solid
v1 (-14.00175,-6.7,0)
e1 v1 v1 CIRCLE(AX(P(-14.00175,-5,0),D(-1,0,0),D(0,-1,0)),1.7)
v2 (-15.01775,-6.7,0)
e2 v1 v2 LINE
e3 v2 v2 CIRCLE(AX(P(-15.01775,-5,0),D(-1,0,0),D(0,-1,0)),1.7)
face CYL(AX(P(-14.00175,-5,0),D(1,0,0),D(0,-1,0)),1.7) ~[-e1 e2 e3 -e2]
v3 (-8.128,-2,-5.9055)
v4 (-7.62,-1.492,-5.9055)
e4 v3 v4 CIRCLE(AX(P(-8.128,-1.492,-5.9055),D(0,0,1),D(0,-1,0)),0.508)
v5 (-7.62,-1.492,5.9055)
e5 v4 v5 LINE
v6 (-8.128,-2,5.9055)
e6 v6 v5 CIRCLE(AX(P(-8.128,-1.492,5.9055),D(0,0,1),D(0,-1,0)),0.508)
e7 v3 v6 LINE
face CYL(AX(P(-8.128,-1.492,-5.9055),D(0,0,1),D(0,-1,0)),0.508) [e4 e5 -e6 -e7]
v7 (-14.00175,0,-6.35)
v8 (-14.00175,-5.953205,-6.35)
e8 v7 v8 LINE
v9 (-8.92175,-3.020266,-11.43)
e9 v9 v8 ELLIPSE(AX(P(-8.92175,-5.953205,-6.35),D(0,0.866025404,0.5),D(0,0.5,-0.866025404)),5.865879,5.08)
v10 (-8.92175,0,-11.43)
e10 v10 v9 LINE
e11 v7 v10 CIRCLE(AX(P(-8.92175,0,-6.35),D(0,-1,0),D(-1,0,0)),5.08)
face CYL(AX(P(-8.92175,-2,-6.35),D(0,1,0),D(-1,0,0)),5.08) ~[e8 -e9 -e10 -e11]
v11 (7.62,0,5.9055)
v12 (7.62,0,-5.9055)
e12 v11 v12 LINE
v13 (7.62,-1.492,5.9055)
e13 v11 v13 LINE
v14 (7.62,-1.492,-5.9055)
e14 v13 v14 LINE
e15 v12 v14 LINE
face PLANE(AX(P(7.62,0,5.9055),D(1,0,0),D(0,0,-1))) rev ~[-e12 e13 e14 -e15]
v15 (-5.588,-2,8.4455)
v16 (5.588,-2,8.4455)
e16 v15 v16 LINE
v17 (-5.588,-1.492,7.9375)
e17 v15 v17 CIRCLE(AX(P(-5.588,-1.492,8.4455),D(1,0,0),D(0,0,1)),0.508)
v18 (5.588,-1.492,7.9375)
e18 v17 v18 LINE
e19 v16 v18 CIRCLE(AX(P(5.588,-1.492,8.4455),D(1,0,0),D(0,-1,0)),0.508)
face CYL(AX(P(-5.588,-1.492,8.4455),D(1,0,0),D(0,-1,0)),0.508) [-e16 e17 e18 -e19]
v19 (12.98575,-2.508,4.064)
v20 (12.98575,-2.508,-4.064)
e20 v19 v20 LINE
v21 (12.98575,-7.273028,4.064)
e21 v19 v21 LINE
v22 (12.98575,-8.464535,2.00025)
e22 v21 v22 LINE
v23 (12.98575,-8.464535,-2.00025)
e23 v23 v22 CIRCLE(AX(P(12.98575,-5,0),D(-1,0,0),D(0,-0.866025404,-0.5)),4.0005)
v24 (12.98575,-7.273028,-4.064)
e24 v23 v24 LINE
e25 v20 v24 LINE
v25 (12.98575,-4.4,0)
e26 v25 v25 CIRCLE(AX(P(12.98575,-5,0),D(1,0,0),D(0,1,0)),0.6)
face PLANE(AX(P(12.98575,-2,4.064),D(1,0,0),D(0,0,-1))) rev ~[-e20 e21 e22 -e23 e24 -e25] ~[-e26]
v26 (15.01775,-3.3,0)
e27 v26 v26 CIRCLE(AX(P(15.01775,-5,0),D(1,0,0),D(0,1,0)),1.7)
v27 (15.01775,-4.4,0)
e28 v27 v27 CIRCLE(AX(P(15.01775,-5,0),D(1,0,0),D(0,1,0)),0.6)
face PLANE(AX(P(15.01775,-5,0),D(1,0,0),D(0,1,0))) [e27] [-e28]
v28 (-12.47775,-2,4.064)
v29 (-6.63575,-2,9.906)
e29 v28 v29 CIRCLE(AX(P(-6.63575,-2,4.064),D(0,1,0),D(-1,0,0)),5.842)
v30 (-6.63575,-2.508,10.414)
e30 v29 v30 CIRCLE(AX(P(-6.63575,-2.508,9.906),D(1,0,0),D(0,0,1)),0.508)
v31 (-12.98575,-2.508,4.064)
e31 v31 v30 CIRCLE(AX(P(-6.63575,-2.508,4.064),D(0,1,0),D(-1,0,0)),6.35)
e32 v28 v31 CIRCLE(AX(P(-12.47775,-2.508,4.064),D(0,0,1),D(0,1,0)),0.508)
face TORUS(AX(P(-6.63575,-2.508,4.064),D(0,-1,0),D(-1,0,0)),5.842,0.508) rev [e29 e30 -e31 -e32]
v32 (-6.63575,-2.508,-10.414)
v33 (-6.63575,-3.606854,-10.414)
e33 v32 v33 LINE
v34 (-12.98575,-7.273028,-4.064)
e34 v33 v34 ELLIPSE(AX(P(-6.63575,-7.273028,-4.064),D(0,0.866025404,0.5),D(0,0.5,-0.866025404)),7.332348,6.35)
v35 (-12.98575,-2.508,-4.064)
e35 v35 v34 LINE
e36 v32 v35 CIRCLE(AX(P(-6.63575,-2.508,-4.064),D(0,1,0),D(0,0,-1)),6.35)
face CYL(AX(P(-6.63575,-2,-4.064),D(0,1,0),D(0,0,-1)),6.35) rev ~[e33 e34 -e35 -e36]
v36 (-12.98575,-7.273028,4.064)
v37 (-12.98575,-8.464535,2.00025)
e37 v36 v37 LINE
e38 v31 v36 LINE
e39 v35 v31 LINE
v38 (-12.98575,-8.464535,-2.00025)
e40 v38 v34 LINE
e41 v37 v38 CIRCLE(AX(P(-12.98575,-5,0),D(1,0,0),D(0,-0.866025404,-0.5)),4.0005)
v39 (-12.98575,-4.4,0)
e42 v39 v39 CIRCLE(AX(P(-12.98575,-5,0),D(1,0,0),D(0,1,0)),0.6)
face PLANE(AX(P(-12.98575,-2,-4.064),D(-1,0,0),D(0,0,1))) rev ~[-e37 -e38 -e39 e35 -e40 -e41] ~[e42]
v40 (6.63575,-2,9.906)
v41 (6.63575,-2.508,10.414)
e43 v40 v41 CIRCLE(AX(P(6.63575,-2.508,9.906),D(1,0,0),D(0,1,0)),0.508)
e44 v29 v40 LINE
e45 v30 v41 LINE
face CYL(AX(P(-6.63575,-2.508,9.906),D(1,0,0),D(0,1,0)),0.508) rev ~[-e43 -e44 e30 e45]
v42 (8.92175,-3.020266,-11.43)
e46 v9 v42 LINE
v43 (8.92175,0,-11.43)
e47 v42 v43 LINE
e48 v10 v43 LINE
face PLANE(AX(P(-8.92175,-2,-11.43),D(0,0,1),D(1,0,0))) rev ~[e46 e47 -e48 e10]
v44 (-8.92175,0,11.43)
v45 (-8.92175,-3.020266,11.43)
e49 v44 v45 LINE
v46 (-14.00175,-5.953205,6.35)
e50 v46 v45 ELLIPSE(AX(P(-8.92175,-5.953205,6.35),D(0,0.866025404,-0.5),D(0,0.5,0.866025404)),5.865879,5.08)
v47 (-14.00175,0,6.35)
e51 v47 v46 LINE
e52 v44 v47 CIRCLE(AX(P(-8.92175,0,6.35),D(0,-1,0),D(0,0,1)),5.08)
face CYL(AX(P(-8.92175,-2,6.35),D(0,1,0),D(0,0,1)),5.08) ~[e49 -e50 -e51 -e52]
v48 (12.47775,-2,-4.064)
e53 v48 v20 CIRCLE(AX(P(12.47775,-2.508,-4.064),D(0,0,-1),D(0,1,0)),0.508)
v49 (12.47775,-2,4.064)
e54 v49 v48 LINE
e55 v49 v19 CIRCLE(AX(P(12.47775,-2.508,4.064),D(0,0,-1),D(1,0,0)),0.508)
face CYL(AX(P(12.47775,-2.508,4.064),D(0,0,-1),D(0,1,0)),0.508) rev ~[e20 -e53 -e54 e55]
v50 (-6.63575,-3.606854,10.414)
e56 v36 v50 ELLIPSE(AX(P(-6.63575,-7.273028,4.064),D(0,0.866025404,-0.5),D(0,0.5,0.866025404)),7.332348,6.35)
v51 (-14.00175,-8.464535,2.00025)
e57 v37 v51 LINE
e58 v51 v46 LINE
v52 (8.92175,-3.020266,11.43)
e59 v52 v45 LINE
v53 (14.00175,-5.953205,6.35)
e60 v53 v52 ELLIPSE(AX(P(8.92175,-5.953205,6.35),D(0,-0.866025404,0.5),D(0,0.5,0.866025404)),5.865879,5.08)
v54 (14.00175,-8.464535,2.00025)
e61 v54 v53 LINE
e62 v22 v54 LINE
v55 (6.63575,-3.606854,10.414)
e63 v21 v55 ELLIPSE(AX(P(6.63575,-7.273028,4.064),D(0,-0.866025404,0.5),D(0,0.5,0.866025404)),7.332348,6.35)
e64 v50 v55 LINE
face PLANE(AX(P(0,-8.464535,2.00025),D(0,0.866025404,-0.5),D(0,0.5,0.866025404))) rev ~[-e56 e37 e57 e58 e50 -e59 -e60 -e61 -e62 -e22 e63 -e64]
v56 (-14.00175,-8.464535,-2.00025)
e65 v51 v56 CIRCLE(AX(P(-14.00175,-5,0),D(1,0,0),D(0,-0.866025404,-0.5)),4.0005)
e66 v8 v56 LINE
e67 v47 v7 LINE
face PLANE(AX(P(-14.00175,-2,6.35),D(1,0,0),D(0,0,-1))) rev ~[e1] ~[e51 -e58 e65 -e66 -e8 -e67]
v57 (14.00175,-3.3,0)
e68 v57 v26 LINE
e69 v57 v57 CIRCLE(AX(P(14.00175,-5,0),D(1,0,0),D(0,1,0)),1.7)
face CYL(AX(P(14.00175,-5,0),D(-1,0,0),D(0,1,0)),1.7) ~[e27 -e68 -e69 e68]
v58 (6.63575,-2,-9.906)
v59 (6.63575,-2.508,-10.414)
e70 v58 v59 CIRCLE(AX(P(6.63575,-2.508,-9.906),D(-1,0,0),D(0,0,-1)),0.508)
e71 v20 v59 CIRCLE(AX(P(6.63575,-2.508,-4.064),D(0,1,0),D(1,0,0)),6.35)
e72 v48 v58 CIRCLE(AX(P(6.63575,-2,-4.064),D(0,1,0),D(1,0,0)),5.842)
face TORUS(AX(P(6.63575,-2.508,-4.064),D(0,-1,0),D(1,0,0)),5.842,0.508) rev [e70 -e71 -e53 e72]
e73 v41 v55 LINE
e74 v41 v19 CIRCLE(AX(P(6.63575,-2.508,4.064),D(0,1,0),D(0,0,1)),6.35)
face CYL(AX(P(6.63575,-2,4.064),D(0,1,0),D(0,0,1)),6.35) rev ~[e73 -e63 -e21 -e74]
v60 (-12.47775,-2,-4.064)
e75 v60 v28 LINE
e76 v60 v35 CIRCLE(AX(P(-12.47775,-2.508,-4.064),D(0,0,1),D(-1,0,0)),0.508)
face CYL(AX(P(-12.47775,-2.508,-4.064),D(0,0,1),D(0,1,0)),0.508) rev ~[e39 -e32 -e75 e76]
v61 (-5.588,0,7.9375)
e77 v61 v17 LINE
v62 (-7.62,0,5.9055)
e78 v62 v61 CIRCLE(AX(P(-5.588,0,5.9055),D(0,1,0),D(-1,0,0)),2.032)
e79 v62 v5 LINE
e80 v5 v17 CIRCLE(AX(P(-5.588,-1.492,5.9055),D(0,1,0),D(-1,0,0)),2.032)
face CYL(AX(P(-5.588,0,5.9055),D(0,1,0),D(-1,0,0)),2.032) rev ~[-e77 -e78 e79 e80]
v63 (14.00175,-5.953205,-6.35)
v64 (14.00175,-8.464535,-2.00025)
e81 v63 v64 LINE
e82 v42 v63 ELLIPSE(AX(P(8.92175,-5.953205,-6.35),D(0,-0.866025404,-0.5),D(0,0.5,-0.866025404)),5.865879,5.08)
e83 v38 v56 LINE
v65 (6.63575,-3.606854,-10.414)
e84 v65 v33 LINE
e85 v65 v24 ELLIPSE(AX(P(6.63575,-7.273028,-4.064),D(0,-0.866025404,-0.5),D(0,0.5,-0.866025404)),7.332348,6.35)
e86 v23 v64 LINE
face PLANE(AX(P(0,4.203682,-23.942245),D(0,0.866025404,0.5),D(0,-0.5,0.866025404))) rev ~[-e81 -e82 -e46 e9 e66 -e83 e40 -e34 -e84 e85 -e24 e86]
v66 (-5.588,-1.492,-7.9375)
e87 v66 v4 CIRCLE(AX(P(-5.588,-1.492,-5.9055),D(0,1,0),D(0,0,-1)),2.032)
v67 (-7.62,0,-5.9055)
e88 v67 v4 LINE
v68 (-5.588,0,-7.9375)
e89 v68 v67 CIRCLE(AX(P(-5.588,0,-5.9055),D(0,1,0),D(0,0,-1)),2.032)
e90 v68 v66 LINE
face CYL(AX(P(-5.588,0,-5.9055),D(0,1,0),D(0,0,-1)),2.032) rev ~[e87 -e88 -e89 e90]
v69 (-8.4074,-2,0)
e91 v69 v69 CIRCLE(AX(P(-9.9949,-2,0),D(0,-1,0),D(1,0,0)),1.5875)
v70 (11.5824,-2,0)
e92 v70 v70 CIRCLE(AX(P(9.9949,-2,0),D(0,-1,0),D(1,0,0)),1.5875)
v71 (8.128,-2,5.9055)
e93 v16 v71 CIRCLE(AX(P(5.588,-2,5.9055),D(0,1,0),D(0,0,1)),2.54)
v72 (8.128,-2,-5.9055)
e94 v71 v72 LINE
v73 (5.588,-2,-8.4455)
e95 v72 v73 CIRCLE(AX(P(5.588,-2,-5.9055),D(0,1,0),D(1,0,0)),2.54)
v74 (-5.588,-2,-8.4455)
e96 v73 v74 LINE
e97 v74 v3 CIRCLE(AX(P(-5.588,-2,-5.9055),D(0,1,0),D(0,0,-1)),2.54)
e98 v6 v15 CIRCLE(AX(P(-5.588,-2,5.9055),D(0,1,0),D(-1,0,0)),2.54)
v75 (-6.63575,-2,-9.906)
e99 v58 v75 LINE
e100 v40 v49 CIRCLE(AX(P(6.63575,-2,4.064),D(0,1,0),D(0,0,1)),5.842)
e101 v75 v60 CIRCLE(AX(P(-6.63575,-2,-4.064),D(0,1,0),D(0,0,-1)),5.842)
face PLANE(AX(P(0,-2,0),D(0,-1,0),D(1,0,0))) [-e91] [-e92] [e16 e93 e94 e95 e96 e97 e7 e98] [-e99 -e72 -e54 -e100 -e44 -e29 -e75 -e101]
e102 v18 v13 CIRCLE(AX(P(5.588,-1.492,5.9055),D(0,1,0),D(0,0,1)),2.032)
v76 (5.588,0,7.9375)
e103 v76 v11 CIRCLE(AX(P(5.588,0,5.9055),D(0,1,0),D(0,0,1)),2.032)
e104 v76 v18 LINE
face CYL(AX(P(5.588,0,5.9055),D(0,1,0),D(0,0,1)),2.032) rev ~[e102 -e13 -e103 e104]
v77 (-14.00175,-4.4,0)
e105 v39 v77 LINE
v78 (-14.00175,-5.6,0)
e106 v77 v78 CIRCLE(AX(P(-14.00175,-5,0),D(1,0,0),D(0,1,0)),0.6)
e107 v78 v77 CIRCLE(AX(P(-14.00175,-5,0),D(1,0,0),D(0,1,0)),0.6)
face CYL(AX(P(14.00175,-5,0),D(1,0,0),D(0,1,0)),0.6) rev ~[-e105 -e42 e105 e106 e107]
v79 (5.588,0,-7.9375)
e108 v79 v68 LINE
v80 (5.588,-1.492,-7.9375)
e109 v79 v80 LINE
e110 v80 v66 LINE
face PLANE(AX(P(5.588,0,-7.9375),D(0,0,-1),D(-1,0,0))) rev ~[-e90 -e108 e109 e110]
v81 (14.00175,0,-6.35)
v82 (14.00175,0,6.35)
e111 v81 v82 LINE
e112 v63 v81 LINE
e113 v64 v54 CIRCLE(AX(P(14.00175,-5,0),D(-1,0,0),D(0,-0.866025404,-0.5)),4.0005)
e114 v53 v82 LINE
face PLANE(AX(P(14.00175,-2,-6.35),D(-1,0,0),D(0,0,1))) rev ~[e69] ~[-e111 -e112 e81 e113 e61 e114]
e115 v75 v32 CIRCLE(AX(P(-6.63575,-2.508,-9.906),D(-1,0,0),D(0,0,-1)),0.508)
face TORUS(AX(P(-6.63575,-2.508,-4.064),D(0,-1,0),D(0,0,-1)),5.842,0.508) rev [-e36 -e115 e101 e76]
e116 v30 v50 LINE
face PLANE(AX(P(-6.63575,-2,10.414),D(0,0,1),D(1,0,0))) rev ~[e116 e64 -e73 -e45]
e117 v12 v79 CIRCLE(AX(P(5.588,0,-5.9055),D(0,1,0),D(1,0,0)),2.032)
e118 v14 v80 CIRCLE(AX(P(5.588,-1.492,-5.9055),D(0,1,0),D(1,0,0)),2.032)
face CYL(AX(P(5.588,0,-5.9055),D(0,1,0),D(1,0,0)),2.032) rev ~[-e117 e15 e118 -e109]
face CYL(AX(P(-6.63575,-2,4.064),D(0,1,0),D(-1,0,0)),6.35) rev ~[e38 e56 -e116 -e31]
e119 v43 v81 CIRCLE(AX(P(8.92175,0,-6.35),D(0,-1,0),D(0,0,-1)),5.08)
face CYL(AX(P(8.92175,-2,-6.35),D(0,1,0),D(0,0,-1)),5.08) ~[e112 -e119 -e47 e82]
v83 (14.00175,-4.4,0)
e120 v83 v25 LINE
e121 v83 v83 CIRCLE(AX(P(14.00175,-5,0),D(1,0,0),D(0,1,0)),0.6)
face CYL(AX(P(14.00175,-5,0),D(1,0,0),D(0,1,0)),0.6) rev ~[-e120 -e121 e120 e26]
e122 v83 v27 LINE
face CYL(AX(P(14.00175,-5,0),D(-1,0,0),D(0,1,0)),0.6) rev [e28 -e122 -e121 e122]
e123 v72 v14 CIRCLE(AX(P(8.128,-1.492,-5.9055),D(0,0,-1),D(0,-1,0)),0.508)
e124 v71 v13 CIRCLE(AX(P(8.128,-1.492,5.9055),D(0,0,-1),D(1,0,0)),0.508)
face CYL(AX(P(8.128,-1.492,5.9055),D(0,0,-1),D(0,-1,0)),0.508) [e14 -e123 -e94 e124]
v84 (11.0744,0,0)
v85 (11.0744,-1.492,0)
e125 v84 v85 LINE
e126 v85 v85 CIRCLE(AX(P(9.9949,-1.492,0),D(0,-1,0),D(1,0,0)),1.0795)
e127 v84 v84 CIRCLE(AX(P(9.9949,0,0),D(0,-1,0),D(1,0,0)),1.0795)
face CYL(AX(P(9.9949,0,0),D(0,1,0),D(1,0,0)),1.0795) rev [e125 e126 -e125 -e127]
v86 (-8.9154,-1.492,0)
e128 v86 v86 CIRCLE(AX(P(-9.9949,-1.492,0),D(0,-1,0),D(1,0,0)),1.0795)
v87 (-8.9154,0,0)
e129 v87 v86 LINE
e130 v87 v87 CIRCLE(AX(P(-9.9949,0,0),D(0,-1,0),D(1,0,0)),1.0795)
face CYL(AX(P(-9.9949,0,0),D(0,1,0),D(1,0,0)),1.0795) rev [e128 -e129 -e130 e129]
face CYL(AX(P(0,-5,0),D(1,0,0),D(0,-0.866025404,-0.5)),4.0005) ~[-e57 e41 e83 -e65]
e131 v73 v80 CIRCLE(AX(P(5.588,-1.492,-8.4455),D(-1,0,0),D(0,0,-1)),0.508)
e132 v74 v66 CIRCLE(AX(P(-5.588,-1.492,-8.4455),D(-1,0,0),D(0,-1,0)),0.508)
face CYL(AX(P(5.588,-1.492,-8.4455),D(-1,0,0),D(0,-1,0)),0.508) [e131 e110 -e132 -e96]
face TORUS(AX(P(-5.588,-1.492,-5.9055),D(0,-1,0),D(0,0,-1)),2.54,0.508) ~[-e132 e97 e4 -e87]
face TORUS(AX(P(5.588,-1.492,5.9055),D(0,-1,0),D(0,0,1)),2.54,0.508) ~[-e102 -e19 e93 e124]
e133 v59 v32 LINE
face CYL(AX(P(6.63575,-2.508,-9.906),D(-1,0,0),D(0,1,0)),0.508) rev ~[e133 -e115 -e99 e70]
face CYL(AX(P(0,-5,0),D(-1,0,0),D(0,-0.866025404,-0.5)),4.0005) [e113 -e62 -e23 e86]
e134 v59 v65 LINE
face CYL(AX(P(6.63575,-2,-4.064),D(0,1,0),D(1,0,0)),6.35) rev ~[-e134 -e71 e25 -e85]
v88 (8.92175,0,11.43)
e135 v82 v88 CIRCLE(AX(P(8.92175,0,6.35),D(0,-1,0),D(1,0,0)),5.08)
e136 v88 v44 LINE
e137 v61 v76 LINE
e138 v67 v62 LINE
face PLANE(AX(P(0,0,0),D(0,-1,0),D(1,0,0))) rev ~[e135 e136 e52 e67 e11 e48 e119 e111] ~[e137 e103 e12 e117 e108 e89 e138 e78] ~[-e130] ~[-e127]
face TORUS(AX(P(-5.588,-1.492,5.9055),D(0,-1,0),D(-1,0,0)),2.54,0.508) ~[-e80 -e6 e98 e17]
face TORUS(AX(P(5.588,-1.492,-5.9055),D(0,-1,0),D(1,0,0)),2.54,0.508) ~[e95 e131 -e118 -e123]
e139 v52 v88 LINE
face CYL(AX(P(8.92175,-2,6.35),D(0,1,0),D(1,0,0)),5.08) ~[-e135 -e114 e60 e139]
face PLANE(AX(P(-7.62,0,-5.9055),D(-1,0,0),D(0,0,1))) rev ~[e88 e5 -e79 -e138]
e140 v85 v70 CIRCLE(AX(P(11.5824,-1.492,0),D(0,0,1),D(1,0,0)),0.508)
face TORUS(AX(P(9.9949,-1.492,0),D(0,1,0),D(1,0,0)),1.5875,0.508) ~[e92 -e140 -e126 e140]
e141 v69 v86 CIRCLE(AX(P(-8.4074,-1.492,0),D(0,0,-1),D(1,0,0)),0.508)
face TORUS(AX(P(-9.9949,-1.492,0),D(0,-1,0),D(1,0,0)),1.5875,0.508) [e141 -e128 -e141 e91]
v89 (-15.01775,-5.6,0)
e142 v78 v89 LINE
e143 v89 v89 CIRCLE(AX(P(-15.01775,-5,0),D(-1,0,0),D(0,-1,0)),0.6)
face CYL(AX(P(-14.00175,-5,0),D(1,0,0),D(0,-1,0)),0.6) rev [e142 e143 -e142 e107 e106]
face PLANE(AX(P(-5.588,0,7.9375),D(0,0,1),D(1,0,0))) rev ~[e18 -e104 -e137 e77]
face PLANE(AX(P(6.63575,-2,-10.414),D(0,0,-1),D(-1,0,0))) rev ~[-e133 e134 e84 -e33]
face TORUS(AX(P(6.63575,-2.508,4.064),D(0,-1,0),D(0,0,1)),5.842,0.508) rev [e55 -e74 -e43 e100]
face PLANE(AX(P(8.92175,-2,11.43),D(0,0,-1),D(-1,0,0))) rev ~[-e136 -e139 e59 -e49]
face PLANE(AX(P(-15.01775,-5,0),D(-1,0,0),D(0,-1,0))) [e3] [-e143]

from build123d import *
from build123d import SkipClean  # not in build123d's __all__

# Parameters (mm, degrees)
F0_R           = 1.0795
F1_DEPTH       = 2
F3_DEPTH       = 19.9898
F4_R           = 0.508
F5_R           = 0.6
F6_DEPTH       = 28.0045
F7_R           = 1.7
F7_R_2         = 0.6
F8_DEPTH       = 1.016
F9_R           = 1.7
F9_R_2         = 0.6
F10_DEPTH      = 1.016
F12_DEPTH      = 25.4
F12_DEPTH_BACK = 25.4


# Not quite as in the source:
# - after a boolean that leaves OpenCascade's solid faulty, fix() repairs it


with BuildPart() as f1:
    # F0 (on Front) → F1 (new body)
    with BuildSketch(Plane.XZ):
        with BuildLine():
            Line((8.92175, 11.43), (-8.92175, 11.43))
            ThreePointArc((-8.92175, 11.43), (-12.5138524484, 9.9421024484), (-14.00175, 6.35))
            Line((-14.00175, 6.35), (-14.00175, -6.35))
            ThreePointArc((-14.00175, -6.35), (-12.5138524484, -9.9421024484), (-8.92175, -11.43))
            Line((-8.92175, -11.43), (8.92175, -11.43))
            ThreePointArc((8.92175, -11.43), (12.5138524484, -9.9421024484), (14.00175, -6.35))
            Line((14.00175, -6.35), (14.00175, 6.35))
            ThreePointArc((14.00175, 6.35), (12.5138524484, 9.9421024484), (8.92175, 11.43))
        make_face()
        with Locations((-9.9949, 0)):
            Circle(F0_R, mode=Mode.SUBTRACT)
        with BuildLine():
            ThreePointArc((-7.62, 5.9055), (-7.0248409794, 7.3423409794), (-5.588, 7.9375))
            Line((-5.588, 7.9375), (5.588, 7.9375))
            ThreePointArc((5.588, 7.9375), (7.0248409794, 7.3423409794), (7.62, 5.9055))
            Line((7.62, 5.9055), (7.62, -5.9055))
            ThreePointArc((7.62, -5.9055), (7.0248409794, -7.3423409794), (5.588, -7.9375))
            Line((5.588, -7.9375), (-5.588, -7.9375))
            ThreePointArc((-5.588, -7.9375), (-7.0248409794, -7.3423409794), (-7.62, -5.9055))
            Line((-7.62, -5.9055), (-7.62, 5.9055))
        make_face(mode=Mode.SUBTRACT)
        with Locations((9.9949, 0)):
            Circle(F0_R, mode=Mode.SUBTRACT)
    extrude(amount=F1_DEPTH)

    # F2 (on face) → F3 (join)
    with BuildSketch(Plane.XZ.offset(2)):
        with BuildLine():
            Line((8.92175, 11.43), (-8.92175, 11.43))
            ThreePointArc((-8.92175, 11.43), (-12.5138524484, 9.9421024484), (-14.00175, 6.35))
            Line((-14.00175, 6.35), (-14.00175, -6.35))
            ThreePointArc((-14.00175, -6.35), (-12.5138524484, -9.9421024484), (-8.92175, -11.43))
            Line((-8.92175, -11.43), (8.92175, -11.43))
            ThreePointArc((8.92175, -11.43), (12.5138524484, -9.9421024484), (14.00175, -6.35))
            Line((14.00175, -6.35), (14.00175, 6.35))
            ThreePointArc((14.00175, 6.35), (12.5138524484, 9.9421024484), (8.92175, 11.43))
        make_face()
        with BuildLine():
            ThreePointArc((-12.98575, 4.064), (-11.1258780605, 8.5541280605), (-6.63575, 10.414))
            Line((-6.63575, 10.414), (6.63575, 10.414))
            ThreePointArc((6.63575, 10.414), (11.1258780605, 8.5541280605), (12.98575, 4.064))
            Line((12.98575, 4.064), (12.98575, -4.064))
            ThreePointArc((12.98575, -4.064), (11.1258780605, -8.5541280605), (6.63575, -10.414))
            Line((6.63575, -10.414), (-6.63575, -10.414))
            ThreePointArc((-6.63575, -10.414), (-11.1258780605, -8.5541280605), (-12.98575, -4.064))
            Line((-12.98575, -4.064), (-12.98575, 4.064))
        make_face(mode=Mode.SUBTRACT)
    extrude(amount=F3_DEPTH)

    # F4
    f4_edges = [f1.edges().sort_by_distance(p)[0] for p in [
        (-11.125878, -2, -8.554128),
        (-12.98575, -2, 0),
        (-11.125878, -2, 8.554128),
        (0, -2, 10.414),
        (11.125878, -2, 8.554128),
        (12.98575, -2, 0),
        (11.125878, -2, -8.554128),
        (0, -2, -10.414),
        (-11.0744, -2, 0),
        (-7.62, -2, 0),
        (-7.024841, -2, -7.342341),
        (-7.024841, -2, 7.342341),
        (0, -2, -7.9375),
        (0, -2, 7.9375),
        (7.024841, -2, -7.342341),
        (7.024841, -2, 7.342341),
        (7.62, -2, 0),
        (8.9154, -2, 0),
    ]]
    fillet(f4_edges, radius=F4_R)

    # F5 (on face) → F6 (cut, through all)
    with BuildSketch(Plane.YZ.offset(14.00175)):
        with Locations((-5, 0)):
            Circle(F5_R)
        with Locations((-11, 0)):
            Circle(F5_R)
    extrude(amount=-F6_DEPTH, mode=Mode.SUBTRACT)

    # F7 (on face) → F8 (join)
    with BuildSketch(Plane.YZ.offset(14.00175)):
        with Locations((-5, 0)):
            Circle(F7_R)
        with Locations((-5, 0)):
            Circle(F7_R_2, mode=Mode.SUBTRACT)
        with Locations((-11, 0)):
            Circle(F7_R)
        with Locations((-11, 0)):
            Circle(F7_R_2, mode=Mode.SUBTRACT)
    extrude(amount=F8_DEPTH)

    # F9 (on face) → F10 (join)
    with BuildSketch(Plane(origin=(-14.00175, 0, 0), x_dir=(0, -1, 0), z_dir=(-1, 0, 0))):
        with Locations((11, 0)):
            Circle(F9_R)
        with Locations((11, 0)):
            Circle(F9_R_2, mode=Mode.SUBTRACT)
        with Locations((5, 0)):
            Circle(F9_R)
        with Locations((5, 0)):
            Circle(F9_R_2, mode=Mode.SUBTRACT)
    with SkipClean():  # cleaning this boolean's faces spoils the solid; the shape is the same uncleaned
        extrude(amount=F10_DEPTH)

    # F11 (on Right) → F12 (cut, two sides)
    with BuildSketch(Plane.YZ) as f12_sk:
        with BuildLine():
            ThreePointArc((-8.4645346278, -2.00025), (-9.0005, 0), (-8.4645346278, 2.00025))
            Line((-8.4645346278, 2.00025), (-2.2869158186, 12.7001996474))
            Line((-2.2869158186, 12.7001996474), (-49.9461684498, 19.8914812337))
            Line((-49.9461684498, 19.8914812337), (-49.9461684498, -23.9422454613))
            Line((-49.9461684498, -23.9422454613), (4.2036823583, -23.9422454613))
            Line((4.2036823583, -23.9422454613), (-8.4645346278, -2.00025))
        make_face()
    extrude(amount=-F12_DEPTH, mode=Mode.SUBTRACT)
    extrude(f12_sk.sketch, amount=F12_DEPTH_BACK, mode=Mode.SUBTRACT)

    add(f1.part.fix(), mode=Mode.REPLACE)


solid = f1.part
